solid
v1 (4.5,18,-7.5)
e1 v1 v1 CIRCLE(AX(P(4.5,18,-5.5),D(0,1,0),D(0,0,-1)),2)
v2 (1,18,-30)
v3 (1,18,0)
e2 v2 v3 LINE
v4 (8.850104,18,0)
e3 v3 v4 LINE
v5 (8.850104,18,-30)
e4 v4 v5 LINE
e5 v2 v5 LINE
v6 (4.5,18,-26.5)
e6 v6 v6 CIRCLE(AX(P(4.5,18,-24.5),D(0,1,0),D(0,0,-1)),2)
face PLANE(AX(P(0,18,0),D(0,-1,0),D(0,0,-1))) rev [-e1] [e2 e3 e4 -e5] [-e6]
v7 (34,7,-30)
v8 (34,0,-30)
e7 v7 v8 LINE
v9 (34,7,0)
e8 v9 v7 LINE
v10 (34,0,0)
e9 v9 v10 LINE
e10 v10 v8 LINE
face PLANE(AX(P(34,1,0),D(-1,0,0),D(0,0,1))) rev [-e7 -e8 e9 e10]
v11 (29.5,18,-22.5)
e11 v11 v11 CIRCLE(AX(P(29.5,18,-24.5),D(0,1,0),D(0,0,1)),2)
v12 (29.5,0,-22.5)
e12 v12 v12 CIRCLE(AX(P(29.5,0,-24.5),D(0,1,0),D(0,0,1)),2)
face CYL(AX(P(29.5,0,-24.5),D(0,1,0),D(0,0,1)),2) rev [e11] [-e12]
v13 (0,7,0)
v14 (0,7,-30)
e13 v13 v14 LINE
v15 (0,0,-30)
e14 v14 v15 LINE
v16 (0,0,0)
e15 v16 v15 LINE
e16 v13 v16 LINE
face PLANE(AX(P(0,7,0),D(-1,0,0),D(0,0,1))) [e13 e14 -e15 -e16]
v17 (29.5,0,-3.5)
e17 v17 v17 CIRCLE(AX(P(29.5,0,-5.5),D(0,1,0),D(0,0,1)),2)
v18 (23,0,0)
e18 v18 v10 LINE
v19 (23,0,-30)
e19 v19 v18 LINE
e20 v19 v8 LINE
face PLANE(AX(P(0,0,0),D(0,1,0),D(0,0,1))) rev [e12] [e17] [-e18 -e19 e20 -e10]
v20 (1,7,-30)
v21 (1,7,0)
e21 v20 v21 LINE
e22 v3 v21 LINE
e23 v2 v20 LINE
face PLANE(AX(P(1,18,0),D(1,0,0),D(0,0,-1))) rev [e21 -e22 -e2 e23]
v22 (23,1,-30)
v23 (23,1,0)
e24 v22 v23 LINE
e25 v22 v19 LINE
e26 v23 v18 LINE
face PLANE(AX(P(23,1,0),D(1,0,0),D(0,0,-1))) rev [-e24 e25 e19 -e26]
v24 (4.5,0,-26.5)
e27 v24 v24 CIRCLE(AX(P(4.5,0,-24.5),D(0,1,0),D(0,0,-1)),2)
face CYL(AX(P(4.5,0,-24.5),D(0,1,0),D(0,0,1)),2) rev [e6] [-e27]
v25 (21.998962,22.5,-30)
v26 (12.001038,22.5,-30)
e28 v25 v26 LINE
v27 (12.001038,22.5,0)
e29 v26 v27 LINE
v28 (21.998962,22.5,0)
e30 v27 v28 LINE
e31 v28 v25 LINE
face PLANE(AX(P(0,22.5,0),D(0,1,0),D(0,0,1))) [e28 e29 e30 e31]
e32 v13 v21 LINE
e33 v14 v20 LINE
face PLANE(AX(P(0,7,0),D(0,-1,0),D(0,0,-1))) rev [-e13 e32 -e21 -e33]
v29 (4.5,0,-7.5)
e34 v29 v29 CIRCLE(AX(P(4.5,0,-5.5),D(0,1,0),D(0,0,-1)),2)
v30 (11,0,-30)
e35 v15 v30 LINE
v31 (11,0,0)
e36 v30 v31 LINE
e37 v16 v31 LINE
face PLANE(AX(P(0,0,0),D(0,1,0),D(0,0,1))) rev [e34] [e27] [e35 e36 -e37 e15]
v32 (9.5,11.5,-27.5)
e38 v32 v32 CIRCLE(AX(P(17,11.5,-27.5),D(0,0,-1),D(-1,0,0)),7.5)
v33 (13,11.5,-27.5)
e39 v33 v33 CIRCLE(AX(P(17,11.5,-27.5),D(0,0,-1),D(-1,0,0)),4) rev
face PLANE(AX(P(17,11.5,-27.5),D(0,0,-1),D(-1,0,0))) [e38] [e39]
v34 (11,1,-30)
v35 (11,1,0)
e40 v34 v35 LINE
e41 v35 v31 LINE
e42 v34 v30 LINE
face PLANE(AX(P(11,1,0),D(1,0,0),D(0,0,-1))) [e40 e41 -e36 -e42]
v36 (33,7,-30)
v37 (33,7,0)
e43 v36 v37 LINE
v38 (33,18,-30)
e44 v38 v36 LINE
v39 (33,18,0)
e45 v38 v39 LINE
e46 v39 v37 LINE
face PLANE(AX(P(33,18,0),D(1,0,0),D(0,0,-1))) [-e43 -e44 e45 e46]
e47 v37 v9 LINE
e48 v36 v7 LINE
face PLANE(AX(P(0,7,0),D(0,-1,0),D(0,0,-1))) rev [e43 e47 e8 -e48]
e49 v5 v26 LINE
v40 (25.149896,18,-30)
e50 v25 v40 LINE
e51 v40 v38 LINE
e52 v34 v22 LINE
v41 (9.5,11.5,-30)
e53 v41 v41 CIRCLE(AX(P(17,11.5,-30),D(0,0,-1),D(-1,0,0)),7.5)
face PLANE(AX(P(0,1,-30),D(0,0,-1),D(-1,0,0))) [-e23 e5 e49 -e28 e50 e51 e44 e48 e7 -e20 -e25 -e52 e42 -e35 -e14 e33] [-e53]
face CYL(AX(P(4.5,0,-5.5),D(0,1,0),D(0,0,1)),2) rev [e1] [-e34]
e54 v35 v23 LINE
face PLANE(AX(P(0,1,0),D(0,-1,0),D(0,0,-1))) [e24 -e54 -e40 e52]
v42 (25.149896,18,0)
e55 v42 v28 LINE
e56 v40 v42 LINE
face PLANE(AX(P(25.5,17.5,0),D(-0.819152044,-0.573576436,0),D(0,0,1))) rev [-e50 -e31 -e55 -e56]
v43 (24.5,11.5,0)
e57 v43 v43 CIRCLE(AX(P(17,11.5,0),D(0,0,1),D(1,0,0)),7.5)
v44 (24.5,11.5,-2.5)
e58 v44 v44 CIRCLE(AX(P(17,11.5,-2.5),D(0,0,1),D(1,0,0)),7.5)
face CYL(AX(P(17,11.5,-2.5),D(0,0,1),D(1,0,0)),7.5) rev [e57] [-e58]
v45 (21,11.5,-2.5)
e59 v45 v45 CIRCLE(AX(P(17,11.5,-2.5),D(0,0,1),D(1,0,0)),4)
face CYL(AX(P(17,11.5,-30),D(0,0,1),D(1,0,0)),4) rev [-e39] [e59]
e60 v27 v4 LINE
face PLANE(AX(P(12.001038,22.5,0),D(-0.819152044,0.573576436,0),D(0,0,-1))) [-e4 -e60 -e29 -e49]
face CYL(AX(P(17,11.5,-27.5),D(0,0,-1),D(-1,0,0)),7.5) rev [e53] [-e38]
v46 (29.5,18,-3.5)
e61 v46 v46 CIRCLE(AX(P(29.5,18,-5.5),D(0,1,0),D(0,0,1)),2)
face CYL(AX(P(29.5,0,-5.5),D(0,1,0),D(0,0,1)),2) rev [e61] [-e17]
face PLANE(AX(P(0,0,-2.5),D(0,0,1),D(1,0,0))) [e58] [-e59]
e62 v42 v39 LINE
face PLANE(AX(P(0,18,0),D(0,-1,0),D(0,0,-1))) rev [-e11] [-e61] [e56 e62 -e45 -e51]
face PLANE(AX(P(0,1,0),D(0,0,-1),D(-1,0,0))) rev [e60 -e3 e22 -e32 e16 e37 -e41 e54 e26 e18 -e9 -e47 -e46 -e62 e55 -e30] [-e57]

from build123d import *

# Parameters (mm, degrees)
SKETCH1_W           = 10
SKETCH1_H           = 30
SKETCH1_W_2         = 1
BOSS_EXTRUDE1_DEPTH = 1
BOSS_EXTRUDE4_START = 1
SKETCH1_3_W         = 34
SKETCH1_3_H         = 30
BOSS_EXTRUDE4_DEPTH = 6
BOSS_EXTRUDE5_START = 7
SKETCH1_4_W         = 10
SKETCH1_4_H         = 30
SKETCH1_4_W_2       = 12
BOSS_EXTRUDE5_DEPTH = 11
SKETCH3_W           = 8.5
SKETCH3_H           = 30
BOSS_EXTRUDE6_DEPTH = 4.5
CHAMFER1_SIZE       = 5
CHAMFER1_SIZE_2     = 3.501037691
SKETCH5_R           = 7.5
SKETCH5_R_2         = 4
CUT_EXTRUDE1_DEPTH  = 2.5
SKETCH5_3_R         = 4
CUT_EXTRUDE2_DEPTH  = 51.618672444
CUT_EXTRUDE4_START  = -27.5
SKETCH5_4_R         = 7.5
SKETCH5_4_R_2       = 4
CUT_EXTRUDE4_DEPTH  = 2.5
SKETCH6_R           = 2
CUT_EXTRUDE5_DEPTH  = 49.785243671


with BuildPart() as part:
    # Sketch1 → Boss-Extrude1 (new body)
    with BuildSketch(Plane(origin=(0, 0, 0), x_dir=(1, 0, 0), z_dir=(0, 1, 0))):
        with Locations((28, 15)):
            Rectangle(SKETCH1_W, SKETCH1_H)
        with Locations((33.5, 15)):
            Rectangle(SKETCH1_W_2, SKETCH1_H)
        with Locations((0.5, 15)):
            Rectangle(SKETCH1_W_2, SKETCH1_H)
        with Locations((6, 15)):
            Rectangle(SKETCH1_W, SKETCH1_H)
    extrude(amount=BOSS_EXTRUDE1_DEPTH)

    # Sketch1<3> → Boss-Extrude4 (add)
    with BuildSketch(Plane(origin=(0, 0, 0), x_dir=(1, 0, 0), z_dir=(0, 1, 0)).offset(BOSS_EXTRUDE4_START)):
        with Locations((17, 15)):
            Rectangle(SKETCH1_3_W, SKETCH1_3_H)
    extrude(amount=BOSS_EXTRUDE4_DEPTH)

    # Sketch1<4> → Boss-Extrude5 (add)
    with BuildSketch(Plane(origin=(0, 0, 0), x_dir=(1, 0, 0), z_dir=(0, 1, 0)).offset(BOSS_EXTRUDE5_START)):
        with Locations((6, 15)):
            Rectangle(SKETCH1_4_W, SKETCH1_4_H)
        with Locations((28, 15)):
            Rectangle(SKETCH1_4_W, SKETCH1_4_H)
        with Locations((17, 15)):
            Rectangle(SKETCH1_4_W_2, SKETCH1_4_H)
    extrude(amount=BOSS_EXTRUDE5_DEPTH)

    # Sketch3 → Boss-Extrude6 (add)
    with BuildSketch(Plane(origin=(0, 18, 0), x_dir=(1, 0, 0), z_dir=(0, 1, 0))):
        with Locations((21.25, 15)):
            Rectangle(SKETCH3_W, SKETCH3_H)
        with Locations((12.75, 15)):
            Rectangle(SKETCH3_W, SKETCH3_H)
    extrude(amount=BOSS_EXTRUDE6_DEPTH)

    # Chamfer1
    # the kernel refuses this chamfer: 5, 3.501037691 mm, written as the material it takes off along each edge
    with BuildSketch(Plane(origin=(25.5, 22.5, 12.912761151), x_dir=(0, -1, 0), z_dir=(0, 0, -1))) as chamfer1_piece_1_section:
        Polygon((CHAMFER1_SIZE, 0), (0, CHAMFER1_SIZE_2), (0, 0), align=None)
    chamfer1_piece_1 = extrude(amount=55.825522303, mode=Mode.PRIVATE)
    chamfer1_piece_1 = split(chamfer1_piece_1, bisect_by=Plane(origin=(25.5, 18, 12.912761151), z_dir=(0, 1, 0)), keep=Keep.TOP, mode=Mode.PRIVATE)
    add(chamfer1_piece_1, mode=Mode.SUBTRACT)
    with BuildSketch(Plane(origin=(8.5, 22.5, -42.912761151), x_dir=(0, -1, 0), z_dir=(0, 0, 1))) as chamfer1_piece_2_section:
        Polygon((CHAMFER1_SIZE, 0), (0, CHAMFER1_SIZE_2), (0, 0), align=None)
    chamfer1_piece_2 = extrude(amount=55.825522303, mode=Mode.PRIVATE)
    chamfer1_piece_2 = split(chamfer1_piece_2, bisect_by=Plane(origin=(8.5, 18, -42.912761151), z_dir=(0, 1, 0)), keep=Keep.TOP, mode=Mode.PRIVATE)
    add(chamfer1_piece_2, mode=Mode.SUBTRACT)

    # Sketch5 → Cut-Extrude1 (cut)
    # profile 1 of 2: a face of its own
    with BuildSketch(Plane.XY):
        with Locations((17, 11.5)):
            Circle(SKETCH5_R)
        with Locations((17, 11.5)):
            Circle(SKETCH5_R_2, mode=Mode.SUBTRACT)
    # profile 2 of 2: a face of its own
    with BuildSketch(Plane.XY):
        with Locations((17, 11.5)):
            Circle(SKETCH5_R_2)
    extrude(amount=-CUT_EXTRUDE1_DEPTH, mode=Mode.SUBTRACT)

    # Sketch5<3> → Cut-Extrude2 (cut, through all)
    with BuildSketch(Plane.XY):
        with Locations((17, 11.5)):
            Circle(SKETCH5_3_R)
    extrude(amount=-CUT_EXTRUDE2_DEPTH, mode=Mode.SUBTRACT)

    # Sketch5<4> → Cut-Extrude4 (cut)
    # profile 1 of 2: a face of its own
    with BuildSketch(Plane.XY.offset(CUT_EXTRUDE4_START)):
        with Locations((17, 11.5)):
            Circle(SKETCH5_4_R)
        with Locations((17, 11.5)):
            Circle(SKETCH5_4_R_2, mode=Mode.SUBTRACT)
    # profile 2 of 2: a face of its own
    with BuildSketch(Plane.XY.offset(CUT_EXTRUDE4_START)):
        with Locations((17, 11.5)):
            Circle(SKETCH5_4_R_2)
    extrude(amount=-CUT_EXTRUDE4_DEPTH, mode=Mode.SUBTRACT)

    # Sketch6 → Cut-Extrude5 (cut, through all)
    with BuildSketch(Plane(origin=(0, 18, 0), x_dir=(1, 0, 0), z_dir=(0, 1, 0))):
        with Locations(Location((29.5, 24.5, 0), (0, 0, 270))):
            Circle(SKETCH6_R)
        with Locations(Location((29.5, 5.5, 0), (0, 0, 270))):
            Circle(SKETCH6_R)
        with Locations(Location((4.5, 24.5, 0), (0, 0, 90))):
            Circle(SKETCH6_R)
        with Locations(Location((4.5, 5.5, 0), (0, 0, 90))):
            Circle(SKETCH6_R)
    extrude(amount=-CUT_EXTRUDE5_DEPTH, mode=Mode.SUBTRACT)


solid = part.part
